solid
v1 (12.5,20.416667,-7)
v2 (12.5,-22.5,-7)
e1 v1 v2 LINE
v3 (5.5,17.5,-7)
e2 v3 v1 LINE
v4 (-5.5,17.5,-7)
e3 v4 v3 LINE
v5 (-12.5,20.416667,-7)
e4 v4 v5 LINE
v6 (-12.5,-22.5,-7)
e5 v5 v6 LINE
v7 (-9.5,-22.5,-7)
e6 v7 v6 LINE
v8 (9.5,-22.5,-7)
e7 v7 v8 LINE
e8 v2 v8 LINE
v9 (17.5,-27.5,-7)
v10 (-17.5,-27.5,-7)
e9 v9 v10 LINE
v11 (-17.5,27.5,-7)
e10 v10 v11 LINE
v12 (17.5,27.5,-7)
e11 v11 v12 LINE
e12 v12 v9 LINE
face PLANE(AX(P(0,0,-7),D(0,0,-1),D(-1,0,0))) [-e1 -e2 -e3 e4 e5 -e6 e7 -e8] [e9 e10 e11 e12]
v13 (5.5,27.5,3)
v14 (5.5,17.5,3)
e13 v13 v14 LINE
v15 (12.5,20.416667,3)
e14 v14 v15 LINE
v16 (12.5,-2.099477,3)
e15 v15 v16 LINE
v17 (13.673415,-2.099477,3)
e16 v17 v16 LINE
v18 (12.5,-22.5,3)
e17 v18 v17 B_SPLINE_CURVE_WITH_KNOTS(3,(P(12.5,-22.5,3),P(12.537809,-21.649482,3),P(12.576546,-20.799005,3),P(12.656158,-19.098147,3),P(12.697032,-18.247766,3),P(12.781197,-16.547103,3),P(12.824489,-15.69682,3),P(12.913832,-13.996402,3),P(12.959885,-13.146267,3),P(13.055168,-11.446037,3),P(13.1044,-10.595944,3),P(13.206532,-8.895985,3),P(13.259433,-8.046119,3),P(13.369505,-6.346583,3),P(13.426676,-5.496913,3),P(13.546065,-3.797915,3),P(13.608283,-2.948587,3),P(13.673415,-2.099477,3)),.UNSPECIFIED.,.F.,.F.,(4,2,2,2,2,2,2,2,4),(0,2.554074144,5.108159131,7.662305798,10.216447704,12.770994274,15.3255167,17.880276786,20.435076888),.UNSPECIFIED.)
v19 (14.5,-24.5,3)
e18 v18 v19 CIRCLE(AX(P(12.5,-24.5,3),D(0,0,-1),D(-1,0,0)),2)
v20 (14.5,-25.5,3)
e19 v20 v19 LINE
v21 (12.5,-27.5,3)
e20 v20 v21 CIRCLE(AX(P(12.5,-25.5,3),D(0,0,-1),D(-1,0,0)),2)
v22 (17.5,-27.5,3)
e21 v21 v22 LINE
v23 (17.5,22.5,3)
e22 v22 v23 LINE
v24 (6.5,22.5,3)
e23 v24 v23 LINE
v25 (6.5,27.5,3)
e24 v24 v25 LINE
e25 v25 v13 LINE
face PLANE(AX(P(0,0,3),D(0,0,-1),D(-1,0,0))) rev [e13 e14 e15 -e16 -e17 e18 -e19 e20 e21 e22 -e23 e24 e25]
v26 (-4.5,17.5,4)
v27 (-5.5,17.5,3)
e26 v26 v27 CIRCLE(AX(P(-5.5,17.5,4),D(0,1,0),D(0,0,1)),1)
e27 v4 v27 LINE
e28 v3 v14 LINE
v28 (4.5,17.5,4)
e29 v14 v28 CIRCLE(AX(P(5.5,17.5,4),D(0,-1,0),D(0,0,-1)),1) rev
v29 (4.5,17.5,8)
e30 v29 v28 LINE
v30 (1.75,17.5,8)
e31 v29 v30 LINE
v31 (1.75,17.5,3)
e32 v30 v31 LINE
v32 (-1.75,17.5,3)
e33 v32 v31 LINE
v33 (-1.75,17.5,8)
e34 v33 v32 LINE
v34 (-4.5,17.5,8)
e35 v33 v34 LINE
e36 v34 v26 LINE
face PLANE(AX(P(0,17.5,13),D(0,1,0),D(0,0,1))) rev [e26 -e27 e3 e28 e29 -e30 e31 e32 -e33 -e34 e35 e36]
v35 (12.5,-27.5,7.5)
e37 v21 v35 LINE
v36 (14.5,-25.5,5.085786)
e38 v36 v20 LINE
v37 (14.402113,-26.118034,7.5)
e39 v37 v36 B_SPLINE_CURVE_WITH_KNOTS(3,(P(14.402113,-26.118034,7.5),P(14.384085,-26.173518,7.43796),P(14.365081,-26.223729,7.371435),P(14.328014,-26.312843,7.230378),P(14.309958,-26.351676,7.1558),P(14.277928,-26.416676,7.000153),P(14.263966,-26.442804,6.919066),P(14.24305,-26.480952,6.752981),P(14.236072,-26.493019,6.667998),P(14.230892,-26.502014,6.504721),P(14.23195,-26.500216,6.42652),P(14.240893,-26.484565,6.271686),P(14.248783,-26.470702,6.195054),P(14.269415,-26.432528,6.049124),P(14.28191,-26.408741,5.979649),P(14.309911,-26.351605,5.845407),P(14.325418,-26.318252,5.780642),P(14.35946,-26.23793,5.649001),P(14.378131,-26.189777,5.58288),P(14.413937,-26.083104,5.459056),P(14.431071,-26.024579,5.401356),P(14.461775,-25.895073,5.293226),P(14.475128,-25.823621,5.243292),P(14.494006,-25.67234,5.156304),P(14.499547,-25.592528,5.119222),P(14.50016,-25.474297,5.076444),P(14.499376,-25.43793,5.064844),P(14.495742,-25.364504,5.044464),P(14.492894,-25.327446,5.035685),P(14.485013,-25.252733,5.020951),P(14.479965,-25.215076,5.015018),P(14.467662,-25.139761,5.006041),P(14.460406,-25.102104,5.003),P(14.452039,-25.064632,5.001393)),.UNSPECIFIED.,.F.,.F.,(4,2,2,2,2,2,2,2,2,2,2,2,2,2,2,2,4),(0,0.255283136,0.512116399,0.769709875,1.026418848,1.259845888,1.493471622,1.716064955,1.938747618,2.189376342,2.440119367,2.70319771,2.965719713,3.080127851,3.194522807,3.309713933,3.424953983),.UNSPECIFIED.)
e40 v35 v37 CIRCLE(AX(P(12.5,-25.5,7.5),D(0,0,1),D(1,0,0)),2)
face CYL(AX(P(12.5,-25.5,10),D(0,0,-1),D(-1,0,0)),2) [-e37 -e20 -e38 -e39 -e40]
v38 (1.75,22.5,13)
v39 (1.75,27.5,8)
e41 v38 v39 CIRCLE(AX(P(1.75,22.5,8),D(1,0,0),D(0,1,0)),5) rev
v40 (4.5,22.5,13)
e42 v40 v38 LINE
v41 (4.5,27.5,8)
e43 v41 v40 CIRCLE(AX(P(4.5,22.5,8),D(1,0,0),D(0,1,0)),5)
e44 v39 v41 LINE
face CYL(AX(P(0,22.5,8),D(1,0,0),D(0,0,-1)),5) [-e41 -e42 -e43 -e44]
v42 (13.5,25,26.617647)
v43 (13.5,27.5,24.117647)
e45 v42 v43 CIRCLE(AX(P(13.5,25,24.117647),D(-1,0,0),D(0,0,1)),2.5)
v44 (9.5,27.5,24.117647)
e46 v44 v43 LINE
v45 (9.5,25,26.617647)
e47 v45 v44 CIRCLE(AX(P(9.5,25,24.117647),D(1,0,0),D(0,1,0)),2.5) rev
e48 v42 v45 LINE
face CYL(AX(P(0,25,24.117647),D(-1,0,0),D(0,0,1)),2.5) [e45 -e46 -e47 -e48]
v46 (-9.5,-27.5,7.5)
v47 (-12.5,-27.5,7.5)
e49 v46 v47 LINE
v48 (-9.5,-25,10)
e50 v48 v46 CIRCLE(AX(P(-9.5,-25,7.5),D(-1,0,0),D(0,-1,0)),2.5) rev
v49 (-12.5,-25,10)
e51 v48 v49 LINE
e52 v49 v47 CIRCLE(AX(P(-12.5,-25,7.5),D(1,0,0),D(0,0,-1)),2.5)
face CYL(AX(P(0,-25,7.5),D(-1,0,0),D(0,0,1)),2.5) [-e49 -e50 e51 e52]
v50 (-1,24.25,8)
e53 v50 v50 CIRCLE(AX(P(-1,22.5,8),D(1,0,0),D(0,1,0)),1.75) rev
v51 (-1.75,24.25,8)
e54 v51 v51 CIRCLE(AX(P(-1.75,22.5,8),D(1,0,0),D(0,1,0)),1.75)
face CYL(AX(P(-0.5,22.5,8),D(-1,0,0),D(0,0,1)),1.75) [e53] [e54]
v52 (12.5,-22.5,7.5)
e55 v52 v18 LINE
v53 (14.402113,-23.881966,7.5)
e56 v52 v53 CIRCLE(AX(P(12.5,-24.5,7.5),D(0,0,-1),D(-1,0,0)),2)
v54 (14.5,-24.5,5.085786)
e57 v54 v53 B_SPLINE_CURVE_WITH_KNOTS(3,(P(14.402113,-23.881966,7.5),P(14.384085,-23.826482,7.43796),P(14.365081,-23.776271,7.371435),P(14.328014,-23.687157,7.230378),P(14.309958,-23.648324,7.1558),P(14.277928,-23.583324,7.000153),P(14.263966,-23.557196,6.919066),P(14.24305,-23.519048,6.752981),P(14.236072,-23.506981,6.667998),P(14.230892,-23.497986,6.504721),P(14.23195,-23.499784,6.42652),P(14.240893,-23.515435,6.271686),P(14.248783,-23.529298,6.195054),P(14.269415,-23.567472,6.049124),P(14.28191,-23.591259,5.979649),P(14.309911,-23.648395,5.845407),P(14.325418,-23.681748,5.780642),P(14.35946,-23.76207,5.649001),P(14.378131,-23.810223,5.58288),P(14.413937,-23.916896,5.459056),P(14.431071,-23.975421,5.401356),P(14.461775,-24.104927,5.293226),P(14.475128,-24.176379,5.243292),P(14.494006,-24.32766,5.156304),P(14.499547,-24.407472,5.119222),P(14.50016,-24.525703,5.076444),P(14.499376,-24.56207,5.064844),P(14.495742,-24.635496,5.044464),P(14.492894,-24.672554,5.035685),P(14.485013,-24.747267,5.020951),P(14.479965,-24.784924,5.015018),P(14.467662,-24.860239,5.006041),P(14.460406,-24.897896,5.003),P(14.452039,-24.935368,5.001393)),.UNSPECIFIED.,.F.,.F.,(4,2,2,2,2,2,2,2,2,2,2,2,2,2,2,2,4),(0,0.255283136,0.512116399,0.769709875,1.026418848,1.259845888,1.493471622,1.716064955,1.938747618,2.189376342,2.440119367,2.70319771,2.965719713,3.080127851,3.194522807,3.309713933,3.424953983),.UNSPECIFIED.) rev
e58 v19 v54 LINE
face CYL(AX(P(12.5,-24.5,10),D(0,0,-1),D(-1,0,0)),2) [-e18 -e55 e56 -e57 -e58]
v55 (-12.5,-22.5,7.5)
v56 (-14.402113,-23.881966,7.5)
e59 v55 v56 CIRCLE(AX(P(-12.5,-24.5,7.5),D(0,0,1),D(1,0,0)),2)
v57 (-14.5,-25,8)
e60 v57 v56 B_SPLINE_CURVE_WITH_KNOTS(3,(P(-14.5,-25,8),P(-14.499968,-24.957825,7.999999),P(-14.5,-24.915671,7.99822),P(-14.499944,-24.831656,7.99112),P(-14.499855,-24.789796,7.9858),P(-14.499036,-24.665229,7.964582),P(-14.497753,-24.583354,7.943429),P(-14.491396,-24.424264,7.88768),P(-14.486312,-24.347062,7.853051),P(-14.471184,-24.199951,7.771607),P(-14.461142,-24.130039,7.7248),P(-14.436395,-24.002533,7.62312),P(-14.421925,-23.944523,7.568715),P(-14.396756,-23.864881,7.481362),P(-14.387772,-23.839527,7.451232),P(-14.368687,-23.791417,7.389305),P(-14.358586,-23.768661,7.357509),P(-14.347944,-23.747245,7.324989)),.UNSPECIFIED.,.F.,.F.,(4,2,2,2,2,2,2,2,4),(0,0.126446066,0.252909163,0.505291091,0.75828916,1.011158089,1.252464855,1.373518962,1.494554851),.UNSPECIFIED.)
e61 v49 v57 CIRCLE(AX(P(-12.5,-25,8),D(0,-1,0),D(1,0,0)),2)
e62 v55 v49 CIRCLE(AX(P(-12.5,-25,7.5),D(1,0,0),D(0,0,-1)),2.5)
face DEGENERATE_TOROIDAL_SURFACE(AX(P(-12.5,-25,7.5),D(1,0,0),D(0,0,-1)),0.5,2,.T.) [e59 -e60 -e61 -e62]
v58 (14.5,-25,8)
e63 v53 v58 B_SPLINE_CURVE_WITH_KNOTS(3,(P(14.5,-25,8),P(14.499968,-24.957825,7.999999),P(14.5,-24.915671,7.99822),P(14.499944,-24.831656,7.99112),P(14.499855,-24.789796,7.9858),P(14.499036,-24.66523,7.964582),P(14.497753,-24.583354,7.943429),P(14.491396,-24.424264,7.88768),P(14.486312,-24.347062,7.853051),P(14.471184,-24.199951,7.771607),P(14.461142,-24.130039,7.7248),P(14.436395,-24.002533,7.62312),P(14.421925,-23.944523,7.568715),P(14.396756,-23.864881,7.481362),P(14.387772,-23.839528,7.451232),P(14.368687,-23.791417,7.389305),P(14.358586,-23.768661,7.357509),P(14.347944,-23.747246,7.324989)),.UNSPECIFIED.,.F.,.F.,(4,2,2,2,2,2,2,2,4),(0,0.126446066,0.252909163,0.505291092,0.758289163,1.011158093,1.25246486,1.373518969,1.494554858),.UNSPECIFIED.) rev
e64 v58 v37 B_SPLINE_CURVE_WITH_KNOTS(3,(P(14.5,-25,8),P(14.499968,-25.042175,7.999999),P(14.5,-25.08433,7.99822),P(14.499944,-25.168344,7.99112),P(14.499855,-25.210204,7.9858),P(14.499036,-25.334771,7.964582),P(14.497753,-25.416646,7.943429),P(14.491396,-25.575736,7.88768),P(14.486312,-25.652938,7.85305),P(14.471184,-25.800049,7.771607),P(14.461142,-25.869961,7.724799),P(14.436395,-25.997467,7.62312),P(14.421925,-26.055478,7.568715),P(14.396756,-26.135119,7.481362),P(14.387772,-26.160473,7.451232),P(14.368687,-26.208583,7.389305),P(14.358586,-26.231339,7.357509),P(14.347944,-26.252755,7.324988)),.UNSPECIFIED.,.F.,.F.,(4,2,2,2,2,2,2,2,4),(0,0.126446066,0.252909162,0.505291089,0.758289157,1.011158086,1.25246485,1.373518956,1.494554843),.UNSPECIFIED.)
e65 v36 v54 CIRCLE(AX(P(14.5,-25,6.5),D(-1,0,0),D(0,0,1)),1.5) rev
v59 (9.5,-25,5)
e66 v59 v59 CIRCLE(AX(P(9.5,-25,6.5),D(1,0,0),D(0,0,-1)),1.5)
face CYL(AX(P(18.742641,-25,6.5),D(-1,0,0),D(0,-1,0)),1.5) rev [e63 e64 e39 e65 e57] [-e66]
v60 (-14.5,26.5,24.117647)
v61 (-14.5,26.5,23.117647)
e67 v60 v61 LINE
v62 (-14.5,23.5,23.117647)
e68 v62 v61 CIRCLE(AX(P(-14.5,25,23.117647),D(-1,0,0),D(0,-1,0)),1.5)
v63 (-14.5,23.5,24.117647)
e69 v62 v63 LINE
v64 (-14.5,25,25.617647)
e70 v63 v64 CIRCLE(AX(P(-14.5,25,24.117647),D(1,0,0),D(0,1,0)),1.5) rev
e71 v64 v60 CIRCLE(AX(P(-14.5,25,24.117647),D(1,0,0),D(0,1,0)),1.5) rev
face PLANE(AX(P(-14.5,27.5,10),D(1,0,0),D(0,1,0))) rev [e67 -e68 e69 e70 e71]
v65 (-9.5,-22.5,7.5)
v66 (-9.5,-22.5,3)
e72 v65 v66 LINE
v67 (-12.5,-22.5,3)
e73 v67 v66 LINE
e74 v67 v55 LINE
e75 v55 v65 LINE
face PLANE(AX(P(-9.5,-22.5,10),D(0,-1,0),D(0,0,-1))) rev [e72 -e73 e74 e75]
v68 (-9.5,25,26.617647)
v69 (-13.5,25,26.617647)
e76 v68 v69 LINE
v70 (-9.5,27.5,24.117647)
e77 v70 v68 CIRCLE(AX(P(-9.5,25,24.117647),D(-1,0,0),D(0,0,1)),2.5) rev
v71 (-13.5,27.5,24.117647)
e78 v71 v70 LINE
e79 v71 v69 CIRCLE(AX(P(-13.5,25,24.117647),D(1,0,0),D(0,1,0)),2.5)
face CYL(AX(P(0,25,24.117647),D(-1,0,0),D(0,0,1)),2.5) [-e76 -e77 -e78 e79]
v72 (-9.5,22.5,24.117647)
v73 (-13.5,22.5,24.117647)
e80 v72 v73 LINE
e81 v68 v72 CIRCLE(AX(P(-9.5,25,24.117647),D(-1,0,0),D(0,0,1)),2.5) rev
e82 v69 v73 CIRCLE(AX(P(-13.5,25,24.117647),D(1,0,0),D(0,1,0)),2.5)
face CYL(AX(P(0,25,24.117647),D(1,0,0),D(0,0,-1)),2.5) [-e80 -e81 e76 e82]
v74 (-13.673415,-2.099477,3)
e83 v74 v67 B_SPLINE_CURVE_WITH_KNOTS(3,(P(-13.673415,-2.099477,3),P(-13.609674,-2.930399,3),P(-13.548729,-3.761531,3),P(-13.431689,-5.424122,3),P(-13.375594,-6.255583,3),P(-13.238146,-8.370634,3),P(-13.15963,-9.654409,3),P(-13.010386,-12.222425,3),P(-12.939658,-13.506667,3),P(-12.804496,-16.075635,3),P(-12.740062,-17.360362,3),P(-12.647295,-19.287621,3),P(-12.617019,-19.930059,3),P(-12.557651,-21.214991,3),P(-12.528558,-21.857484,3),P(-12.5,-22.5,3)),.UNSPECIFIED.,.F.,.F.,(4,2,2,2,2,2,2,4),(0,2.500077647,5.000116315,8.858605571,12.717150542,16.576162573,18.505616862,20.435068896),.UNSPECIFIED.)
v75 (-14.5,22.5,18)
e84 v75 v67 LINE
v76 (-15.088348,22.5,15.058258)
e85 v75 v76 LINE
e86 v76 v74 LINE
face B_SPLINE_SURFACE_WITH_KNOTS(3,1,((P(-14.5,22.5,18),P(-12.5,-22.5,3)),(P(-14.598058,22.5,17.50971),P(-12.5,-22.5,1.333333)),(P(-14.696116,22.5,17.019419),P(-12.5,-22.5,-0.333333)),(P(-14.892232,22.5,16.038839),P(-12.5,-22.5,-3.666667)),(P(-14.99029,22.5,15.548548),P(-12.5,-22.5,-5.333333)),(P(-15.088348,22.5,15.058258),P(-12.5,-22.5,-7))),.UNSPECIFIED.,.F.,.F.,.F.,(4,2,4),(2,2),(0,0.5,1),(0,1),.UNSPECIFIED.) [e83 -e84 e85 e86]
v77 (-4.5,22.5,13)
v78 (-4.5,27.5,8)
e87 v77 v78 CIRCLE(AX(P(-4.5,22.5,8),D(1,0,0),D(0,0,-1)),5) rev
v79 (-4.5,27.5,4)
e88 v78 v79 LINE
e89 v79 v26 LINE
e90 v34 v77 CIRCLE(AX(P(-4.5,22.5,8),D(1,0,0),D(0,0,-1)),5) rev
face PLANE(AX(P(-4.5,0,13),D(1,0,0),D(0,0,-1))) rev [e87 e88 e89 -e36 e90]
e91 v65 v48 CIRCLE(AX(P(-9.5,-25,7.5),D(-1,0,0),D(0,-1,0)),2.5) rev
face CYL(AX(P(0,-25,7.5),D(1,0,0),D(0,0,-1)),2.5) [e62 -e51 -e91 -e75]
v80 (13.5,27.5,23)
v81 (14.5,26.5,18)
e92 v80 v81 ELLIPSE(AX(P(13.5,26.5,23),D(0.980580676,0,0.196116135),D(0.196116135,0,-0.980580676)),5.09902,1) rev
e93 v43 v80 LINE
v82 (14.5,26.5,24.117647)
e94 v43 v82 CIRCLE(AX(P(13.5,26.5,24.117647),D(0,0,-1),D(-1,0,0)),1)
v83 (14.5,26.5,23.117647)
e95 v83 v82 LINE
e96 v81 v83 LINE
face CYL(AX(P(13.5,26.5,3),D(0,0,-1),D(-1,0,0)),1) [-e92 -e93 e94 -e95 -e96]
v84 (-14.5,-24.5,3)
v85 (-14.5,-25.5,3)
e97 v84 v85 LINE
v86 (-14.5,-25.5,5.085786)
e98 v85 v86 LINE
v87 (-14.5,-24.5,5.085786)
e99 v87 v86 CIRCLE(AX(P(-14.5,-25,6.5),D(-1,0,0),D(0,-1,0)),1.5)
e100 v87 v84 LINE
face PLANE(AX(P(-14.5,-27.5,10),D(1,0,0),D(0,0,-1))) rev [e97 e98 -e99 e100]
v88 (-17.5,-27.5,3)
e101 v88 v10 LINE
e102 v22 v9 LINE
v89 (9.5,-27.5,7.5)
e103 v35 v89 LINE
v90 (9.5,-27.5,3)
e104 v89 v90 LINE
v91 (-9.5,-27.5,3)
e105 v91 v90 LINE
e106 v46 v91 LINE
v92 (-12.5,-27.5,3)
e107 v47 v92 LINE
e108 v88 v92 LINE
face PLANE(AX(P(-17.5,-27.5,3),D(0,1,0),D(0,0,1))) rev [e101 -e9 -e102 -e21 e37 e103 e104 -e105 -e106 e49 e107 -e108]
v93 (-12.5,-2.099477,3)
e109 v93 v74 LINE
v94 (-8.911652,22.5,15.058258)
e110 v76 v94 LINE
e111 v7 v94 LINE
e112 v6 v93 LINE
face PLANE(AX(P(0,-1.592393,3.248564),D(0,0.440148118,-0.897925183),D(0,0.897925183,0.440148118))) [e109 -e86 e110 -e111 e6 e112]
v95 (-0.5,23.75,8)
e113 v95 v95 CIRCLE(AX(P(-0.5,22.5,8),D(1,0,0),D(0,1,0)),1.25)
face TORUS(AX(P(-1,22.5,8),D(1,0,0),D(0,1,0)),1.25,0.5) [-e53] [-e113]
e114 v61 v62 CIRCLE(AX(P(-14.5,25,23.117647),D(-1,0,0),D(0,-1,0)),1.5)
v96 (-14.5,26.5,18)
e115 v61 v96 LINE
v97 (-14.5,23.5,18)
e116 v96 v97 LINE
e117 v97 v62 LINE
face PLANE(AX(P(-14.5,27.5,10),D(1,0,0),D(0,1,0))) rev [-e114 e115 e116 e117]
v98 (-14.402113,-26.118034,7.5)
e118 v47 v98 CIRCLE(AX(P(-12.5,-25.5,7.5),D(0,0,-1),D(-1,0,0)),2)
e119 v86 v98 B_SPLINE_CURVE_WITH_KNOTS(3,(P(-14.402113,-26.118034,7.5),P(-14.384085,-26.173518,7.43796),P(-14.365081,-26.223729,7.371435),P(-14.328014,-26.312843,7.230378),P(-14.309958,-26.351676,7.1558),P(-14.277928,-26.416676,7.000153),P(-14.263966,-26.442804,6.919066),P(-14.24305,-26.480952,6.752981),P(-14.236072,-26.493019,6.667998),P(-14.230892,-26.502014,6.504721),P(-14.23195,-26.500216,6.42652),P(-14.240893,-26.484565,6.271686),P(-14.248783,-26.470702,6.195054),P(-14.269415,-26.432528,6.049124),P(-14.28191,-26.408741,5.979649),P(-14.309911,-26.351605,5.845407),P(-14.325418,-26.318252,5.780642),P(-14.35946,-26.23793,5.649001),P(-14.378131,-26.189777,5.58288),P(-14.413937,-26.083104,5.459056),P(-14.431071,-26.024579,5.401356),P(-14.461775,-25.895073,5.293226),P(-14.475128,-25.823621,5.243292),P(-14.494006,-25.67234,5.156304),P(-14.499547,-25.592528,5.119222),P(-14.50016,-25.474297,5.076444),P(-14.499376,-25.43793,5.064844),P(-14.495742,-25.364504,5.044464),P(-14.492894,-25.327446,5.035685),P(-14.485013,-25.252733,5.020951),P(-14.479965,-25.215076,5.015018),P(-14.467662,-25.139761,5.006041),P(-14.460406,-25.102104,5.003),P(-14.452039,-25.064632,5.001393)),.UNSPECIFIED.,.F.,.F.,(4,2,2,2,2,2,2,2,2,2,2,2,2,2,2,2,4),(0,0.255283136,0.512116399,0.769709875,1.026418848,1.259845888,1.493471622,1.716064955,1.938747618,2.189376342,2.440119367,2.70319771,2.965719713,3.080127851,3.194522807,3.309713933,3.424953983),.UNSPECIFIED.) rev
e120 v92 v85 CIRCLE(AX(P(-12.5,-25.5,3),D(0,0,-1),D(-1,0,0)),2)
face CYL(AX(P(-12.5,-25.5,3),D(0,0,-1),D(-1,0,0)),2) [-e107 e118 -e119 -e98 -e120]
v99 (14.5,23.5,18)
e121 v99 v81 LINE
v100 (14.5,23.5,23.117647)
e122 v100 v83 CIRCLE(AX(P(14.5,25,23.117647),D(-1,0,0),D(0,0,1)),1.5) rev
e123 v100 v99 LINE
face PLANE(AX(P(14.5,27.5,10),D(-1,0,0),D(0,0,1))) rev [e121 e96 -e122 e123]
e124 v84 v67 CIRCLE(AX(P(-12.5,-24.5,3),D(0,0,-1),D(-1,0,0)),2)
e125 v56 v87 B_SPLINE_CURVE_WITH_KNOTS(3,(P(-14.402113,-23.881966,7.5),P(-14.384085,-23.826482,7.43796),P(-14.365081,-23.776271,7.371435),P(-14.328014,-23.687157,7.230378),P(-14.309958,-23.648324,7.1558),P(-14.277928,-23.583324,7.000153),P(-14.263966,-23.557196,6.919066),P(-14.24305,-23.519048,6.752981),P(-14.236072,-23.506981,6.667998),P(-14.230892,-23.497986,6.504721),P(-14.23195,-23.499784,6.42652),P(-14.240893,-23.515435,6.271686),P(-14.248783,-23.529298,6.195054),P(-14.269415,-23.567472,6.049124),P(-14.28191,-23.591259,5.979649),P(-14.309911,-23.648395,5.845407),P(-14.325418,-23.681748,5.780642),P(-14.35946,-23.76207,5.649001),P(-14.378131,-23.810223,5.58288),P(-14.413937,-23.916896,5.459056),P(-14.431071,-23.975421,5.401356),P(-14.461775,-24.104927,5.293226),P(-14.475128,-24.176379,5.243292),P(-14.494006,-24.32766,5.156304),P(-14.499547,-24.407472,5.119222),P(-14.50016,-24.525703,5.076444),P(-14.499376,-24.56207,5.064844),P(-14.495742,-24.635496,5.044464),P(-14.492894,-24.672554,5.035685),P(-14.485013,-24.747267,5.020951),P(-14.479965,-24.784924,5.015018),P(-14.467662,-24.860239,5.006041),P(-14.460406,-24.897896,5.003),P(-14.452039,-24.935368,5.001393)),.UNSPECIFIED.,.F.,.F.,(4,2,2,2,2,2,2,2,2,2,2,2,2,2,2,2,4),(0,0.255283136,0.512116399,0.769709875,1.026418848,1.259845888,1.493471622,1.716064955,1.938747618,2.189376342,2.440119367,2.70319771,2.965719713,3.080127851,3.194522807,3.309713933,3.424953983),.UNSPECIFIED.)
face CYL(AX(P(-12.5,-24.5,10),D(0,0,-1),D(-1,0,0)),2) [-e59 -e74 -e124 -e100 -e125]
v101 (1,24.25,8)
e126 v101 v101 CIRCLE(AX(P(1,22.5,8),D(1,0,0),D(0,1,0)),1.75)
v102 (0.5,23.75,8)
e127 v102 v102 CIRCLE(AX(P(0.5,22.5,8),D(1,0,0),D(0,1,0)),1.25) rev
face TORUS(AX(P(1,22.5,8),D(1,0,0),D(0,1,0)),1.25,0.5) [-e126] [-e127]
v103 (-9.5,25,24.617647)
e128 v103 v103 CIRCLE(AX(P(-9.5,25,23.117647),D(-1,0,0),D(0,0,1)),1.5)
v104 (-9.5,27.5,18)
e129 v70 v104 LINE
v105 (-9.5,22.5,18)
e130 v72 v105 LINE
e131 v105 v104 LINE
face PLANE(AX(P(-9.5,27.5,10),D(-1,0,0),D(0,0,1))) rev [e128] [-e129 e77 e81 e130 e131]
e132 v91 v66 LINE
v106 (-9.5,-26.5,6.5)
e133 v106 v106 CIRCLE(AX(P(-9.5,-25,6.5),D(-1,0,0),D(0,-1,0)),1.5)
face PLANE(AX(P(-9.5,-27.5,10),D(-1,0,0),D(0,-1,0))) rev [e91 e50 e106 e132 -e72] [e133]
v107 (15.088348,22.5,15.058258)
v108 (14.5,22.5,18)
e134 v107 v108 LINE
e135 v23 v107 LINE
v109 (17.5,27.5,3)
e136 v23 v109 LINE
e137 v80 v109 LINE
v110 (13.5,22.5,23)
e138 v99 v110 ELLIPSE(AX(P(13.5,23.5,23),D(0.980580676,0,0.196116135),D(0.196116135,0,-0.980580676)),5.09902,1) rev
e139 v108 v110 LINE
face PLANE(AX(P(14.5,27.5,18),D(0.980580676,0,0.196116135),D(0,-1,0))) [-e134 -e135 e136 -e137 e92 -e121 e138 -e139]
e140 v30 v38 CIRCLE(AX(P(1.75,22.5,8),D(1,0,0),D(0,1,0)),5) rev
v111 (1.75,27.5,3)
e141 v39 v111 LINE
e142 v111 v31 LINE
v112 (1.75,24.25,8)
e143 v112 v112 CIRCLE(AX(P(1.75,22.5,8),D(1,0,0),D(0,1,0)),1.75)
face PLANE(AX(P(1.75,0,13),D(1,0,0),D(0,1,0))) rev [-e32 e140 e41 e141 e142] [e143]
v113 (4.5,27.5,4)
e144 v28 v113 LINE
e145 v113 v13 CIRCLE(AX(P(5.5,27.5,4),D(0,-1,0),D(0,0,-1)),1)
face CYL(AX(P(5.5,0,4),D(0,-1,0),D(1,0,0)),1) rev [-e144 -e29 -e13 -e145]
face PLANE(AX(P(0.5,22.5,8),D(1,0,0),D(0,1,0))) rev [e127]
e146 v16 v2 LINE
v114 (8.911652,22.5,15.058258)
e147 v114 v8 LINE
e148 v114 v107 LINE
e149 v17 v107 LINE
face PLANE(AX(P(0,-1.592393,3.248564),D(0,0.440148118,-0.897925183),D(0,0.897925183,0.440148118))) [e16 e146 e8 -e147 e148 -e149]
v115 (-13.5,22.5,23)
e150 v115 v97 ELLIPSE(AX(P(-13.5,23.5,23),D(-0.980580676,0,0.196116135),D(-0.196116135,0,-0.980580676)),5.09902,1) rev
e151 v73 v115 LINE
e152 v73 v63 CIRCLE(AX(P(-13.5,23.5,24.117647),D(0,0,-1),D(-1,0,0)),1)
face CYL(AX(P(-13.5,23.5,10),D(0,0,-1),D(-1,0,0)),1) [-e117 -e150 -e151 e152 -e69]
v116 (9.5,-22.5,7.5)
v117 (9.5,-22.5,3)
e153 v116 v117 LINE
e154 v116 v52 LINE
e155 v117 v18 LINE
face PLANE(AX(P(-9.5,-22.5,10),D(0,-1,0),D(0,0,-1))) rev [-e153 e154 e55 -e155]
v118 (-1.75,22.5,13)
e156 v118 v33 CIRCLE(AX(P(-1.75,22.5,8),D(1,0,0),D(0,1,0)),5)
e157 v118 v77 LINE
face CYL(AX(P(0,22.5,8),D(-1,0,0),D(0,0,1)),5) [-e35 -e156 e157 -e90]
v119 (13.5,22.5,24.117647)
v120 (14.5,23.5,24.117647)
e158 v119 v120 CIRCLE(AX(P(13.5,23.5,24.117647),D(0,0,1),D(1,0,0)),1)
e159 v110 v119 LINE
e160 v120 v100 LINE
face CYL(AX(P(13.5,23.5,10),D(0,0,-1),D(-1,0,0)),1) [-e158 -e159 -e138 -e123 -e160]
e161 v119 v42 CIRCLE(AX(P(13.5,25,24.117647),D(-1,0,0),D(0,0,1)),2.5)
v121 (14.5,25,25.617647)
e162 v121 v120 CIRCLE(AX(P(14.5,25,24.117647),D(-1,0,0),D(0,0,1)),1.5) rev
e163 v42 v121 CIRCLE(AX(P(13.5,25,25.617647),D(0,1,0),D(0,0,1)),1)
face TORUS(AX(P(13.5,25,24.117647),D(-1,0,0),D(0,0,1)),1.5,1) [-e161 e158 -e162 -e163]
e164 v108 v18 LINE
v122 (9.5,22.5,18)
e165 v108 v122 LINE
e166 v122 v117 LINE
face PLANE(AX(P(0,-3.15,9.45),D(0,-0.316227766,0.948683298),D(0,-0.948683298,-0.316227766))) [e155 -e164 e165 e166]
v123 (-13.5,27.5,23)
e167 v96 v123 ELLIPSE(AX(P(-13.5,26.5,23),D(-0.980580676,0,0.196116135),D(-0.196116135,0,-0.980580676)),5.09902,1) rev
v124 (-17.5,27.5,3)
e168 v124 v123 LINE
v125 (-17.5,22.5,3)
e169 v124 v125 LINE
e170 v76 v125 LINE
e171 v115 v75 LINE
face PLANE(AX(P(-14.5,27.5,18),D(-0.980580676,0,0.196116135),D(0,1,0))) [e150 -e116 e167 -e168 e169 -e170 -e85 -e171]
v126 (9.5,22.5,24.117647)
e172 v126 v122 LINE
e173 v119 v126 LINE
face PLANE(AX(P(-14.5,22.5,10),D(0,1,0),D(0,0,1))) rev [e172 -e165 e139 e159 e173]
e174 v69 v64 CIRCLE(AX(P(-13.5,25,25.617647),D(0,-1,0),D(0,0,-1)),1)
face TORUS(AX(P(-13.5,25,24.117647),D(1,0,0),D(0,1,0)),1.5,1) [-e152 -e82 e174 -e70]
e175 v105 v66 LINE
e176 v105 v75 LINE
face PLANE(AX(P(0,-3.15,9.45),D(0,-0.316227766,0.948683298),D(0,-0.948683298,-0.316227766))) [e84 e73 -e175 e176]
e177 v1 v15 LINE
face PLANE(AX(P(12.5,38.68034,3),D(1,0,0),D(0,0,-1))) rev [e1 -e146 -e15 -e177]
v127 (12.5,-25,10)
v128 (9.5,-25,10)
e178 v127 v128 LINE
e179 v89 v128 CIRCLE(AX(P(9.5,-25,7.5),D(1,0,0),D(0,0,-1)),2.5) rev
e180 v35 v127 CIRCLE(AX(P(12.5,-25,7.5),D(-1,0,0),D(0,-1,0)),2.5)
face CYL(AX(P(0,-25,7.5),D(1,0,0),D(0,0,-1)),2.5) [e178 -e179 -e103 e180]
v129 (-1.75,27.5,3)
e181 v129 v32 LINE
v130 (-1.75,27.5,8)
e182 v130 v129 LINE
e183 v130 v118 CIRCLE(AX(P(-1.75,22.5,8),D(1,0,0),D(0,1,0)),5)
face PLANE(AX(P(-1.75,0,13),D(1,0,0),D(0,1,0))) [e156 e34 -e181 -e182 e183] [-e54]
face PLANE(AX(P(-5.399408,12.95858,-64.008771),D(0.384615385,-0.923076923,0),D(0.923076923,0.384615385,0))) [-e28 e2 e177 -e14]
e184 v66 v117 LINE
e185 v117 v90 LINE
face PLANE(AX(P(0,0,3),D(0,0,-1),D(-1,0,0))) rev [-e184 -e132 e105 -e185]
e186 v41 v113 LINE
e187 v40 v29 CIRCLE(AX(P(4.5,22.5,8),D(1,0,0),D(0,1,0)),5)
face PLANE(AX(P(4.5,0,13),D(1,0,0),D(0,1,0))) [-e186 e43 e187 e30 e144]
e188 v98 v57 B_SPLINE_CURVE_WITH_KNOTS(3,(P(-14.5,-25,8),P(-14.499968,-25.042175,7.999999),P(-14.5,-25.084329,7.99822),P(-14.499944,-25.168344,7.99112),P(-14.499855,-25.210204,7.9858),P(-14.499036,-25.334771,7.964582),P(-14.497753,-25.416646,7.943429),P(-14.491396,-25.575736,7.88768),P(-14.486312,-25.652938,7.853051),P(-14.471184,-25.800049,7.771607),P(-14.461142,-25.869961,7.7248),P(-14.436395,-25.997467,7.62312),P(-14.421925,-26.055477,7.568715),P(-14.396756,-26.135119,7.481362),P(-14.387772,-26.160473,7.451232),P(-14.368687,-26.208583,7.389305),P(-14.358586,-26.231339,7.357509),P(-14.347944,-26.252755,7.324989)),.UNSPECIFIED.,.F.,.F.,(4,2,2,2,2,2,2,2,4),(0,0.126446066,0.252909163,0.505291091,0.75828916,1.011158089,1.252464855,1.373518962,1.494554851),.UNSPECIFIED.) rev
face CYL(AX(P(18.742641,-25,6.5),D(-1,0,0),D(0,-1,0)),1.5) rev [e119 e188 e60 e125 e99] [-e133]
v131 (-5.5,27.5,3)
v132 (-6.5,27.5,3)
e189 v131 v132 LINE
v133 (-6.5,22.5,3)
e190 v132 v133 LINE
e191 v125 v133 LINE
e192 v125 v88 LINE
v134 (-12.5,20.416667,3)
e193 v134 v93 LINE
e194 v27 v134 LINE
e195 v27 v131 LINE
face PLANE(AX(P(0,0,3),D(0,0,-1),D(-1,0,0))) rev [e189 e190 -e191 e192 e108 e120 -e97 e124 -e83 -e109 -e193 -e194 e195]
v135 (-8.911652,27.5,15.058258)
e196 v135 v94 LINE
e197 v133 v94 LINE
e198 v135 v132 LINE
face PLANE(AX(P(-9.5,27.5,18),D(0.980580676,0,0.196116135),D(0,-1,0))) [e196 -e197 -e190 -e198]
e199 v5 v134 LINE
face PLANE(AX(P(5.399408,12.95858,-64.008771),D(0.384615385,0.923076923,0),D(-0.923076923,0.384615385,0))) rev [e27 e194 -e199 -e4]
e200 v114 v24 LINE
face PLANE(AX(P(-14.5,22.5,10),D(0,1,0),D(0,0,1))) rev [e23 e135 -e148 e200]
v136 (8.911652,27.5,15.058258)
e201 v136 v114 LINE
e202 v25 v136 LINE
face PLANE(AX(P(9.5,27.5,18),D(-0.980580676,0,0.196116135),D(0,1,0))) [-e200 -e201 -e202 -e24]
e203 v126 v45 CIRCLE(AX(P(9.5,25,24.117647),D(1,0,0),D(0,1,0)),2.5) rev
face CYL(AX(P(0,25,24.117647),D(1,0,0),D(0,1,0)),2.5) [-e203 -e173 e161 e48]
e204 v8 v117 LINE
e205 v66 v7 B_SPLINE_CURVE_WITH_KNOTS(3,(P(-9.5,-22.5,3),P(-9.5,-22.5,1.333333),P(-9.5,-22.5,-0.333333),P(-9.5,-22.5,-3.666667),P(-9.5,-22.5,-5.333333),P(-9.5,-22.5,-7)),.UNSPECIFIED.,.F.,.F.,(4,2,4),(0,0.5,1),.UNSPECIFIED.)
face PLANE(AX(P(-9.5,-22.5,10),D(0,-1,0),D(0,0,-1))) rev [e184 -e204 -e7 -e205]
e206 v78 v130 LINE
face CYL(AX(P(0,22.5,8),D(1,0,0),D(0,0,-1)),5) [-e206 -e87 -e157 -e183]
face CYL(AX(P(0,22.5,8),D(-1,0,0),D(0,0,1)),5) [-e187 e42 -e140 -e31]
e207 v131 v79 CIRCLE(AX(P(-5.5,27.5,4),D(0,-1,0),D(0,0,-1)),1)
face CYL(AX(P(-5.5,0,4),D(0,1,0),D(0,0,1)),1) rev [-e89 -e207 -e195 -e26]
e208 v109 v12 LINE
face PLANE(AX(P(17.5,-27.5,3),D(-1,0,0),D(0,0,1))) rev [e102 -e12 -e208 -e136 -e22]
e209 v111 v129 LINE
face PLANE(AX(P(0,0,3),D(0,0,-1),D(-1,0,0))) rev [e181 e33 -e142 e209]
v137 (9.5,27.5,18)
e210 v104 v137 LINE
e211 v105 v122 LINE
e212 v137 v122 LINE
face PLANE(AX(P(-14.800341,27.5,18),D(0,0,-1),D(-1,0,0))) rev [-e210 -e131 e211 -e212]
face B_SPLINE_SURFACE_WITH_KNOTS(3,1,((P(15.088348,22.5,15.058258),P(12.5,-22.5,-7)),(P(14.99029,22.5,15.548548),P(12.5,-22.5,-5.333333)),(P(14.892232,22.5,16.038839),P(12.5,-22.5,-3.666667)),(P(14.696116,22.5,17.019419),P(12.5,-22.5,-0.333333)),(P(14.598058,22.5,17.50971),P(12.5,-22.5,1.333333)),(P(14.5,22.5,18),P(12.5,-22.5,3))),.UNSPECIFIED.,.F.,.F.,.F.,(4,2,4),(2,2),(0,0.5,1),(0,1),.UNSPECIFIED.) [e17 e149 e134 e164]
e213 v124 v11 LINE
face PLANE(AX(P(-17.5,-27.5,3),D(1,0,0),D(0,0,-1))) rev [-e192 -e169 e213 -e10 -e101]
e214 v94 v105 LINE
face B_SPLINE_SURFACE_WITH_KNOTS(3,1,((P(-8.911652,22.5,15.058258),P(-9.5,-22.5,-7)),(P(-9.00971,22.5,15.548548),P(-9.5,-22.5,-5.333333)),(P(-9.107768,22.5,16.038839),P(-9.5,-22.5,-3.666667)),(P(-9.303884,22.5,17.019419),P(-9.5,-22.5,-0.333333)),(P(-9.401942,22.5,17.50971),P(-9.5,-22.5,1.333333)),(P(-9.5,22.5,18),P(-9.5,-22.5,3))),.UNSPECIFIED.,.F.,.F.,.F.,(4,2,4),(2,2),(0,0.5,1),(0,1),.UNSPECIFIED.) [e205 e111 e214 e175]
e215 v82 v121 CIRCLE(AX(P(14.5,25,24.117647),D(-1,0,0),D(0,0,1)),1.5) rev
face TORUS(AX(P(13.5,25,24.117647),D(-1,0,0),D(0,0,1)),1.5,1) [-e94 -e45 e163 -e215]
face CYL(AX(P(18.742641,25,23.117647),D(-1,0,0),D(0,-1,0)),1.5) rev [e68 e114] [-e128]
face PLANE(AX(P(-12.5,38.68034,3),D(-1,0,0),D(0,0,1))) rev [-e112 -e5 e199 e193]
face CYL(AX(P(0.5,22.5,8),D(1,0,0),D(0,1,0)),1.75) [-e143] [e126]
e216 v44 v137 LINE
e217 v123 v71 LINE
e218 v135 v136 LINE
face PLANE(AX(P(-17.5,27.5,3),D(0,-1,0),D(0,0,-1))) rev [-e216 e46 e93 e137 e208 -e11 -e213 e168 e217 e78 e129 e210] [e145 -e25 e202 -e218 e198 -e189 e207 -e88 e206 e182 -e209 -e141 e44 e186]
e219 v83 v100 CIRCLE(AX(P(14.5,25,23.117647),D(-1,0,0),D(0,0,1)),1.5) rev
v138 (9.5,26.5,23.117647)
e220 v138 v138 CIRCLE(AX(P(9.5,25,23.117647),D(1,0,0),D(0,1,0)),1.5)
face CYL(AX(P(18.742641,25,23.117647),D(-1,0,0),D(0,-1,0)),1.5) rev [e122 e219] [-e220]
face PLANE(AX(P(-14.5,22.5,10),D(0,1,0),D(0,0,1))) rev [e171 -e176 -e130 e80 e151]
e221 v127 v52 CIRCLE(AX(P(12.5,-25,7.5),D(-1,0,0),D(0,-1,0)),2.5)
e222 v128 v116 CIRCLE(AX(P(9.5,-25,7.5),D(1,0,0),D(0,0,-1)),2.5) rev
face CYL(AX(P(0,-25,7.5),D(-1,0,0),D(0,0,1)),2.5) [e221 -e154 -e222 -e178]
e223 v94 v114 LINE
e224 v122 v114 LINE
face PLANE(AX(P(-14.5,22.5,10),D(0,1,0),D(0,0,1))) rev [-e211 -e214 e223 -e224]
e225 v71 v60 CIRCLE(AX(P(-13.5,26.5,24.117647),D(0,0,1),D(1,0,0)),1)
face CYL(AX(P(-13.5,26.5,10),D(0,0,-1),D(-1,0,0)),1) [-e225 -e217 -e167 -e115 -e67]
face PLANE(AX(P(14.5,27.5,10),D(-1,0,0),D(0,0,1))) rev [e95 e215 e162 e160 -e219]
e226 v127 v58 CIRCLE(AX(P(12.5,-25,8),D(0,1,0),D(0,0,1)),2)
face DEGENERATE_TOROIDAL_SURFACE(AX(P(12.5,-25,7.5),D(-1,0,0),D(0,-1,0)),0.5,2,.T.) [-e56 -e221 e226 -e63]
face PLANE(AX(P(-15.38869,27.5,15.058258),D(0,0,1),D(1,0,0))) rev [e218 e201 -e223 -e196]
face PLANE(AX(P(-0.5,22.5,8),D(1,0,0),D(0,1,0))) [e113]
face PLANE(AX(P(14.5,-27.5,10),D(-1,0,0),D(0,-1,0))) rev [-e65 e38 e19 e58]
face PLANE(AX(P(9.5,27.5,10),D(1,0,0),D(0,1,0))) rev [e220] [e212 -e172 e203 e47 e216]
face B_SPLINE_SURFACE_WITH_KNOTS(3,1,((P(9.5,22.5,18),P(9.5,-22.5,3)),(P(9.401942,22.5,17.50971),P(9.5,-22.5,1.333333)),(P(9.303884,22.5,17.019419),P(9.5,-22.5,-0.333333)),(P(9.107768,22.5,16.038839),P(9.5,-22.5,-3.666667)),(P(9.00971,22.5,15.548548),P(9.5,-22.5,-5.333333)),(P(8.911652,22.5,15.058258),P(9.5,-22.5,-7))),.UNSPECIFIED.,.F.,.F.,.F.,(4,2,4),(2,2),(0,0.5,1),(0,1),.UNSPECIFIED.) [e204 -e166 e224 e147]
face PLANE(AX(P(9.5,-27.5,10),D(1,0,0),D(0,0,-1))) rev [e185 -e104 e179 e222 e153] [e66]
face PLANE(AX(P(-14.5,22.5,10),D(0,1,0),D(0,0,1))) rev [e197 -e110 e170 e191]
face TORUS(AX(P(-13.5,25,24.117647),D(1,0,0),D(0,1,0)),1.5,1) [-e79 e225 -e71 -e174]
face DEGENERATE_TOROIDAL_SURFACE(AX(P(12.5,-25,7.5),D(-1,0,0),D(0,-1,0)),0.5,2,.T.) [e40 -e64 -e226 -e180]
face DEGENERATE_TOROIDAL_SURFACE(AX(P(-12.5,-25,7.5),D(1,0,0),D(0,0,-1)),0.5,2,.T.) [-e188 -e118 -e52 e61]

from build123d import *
from OCP.BRepFilletAPI import BRepFilletAPI_MakeChamfer

# Parameters (mm, degrees)
SKETCH1_W           = 35
SKETCH1_H           = 55
BOSS_EXTRUDE1_DEPTH = 3
SKETCH2_W           = 5
SKETCH2_H           = 5
BOSS_EXTRUDE2_DEPTH = 7
CUT_EXTRUDE1_REACH  = 45.362
FILLET1_R           = 2.5
SKETCH4_W           = 5
SKETCH4_H           = 5
BOSS_EXTRUDE3_DEPTH = 16.61764706
CUT_EXTRUDE2_REACH  = 51.887
FILLET2_R           = 2.5
FILLET3_R           = 2
CHAMFER1_SIZE       = 3
CHAMFER1_SIZE_2     = 15
FILLET5_R           = 1
SKETCH6_W           = 2.75
SKETCH6_H           = 10
BOSS_EXTRUDE4_DEPTH = 10
FILLET6_R           = 5
FILLET7_R           = 1
BOSS_EXTRUDE5_START = -2.75
BOSS_EXTRUDE5_DEPTH = 1.25
BOSS_EXTRUDE6_START = -4
BOSS_EXTRUDE6_DEPTH = 1.25
CHAMFER2_SIZE       = 3
CHAMFER2_SIZE2      = 15
BOSS_EXTRUDE7_REACH = 48.364
SKETCH10_W          = 3
SKETCH10_H          = 5
SKETCH15_W          = 35
SKETCH15_H          = 55
BOSS_EXTRUDE8_DEPTH = 7
CUT_EXTRUDE5_DEPTH  = 10
BOSS_EXTRUDE9_START = -5
SKETCH19_W          = 5
SKETCH19_H          = 10
BOSS_EXTRUDE9_DEPTH = 55


with BuildPart() as part:
    # Sketch1 → Boss-Extrude1 (new body)
    with BuildSketch(Plane.XY):
        Rectangle(SKETCH1_W, SKETCH1_H)
    extrude(amount=BOSS_EXTRUDE1_DEPTH)

    # Sketch2 → Boss-Extrude2 (add)
    with BuildSketch(Plane.XY.offset(3)):
        with Locations((-12, 25)):
            Rectangle(SKETCH2_W, SKETCH2_H)
        with Locations((12, 25)):
            Rectangle(SKETCH2_W, SKETCH2_H)
        with Locations((-12, -25)):
            Rectangle(SKETCH2_W, SKETCH2_H)
        with Locations((12, -25)):
            Rectangle(SKETCH2_W, SKETCH2_H)
    extrude(amount=BOSS_EXTRUDE2_DEPTH)

    # Cut-Extrude1: up to this face of the body (flat: up to its plane)
    cut_extrude1_end = Plane(part.part.faces().sort_by_distance((14.5, 25, 6.5))[0])
    # Sketch3 → Cut-Extrude1 (cut, up to the picked face)
    with BuildSketch(Plane.ZY.offset(14.5), mode=Mode.PRIVATE) as cut_extrude1_sk1:
        with BuildLine():
            ThreePointArc((8, -25), (6.957766147, -23.571556737), (5.279399793, -24.128142709))
            Line((5.279399793, -24.128142709), (7.720600207, -25.871857291))
            ThreePointArc((7.720600207, -25.871857291), (7.928443263, -25.457766147), (8, -25))
        make_face()
    cut_extrude1_tool1 = split(extrude(cut_extrude1_sk1.sketch, amount=-CUT_EXTRUDE1_REACH, mode=Mode.PRIVATE), bisect_by=cut_extrude1_end, keep=Keep.BOTH, mode=Mode.PRIVATE)
    # Sketch3 → Cut-Extrude1 (cut, up to the picked face)
    with BuildSketch(Plane.ZY.offset(14.5), mode=Mode.PRIVATE) as cut_extrude1_sk2:
        with BuildLine():
            Line((7.720600207, -25.871857291), (5.279399793, -24.128142709))
            ThreePointArc((5.279399793, -24.128142709), (5.628142709, -26.220600207), (7.720600207, -25.871857291))
        make_face()
    cut_extrude1_tool2 = split(extrude(cut_extrude1_sk2.sketch, amount=-CUT_EXTRUDE1_REACH, mode=Mode.PRIVATE), bisect_by=cut_extrude1_end, keep=Keep.BOTH, mode=Mode.PRIVATE)
    # Sketch3 → Cut-Extrude1 (cut, up to the picked face)
    with BuildSketch(Plane.ZY.offset(14.5), mode=Mode.PRIVATE) as cut_extrude1_sk3:
        with BuildLine():
            ThreePointArc((8, -25), (6.957766147, -23.571556737), (5.279399793, -24.128142709))
            Line((5.279399793, -24.128142709), (7.720600207, -25.871857291))
            ThreePointArc((7.720600207, -25.871857291), (7.928443263, -25.457766147), (8, -25))
        make_face()
    cut_extrude1_tool3 = split(extrude(cut_extrude1_sk3.sketch, amount=-CUT_EXTRUDE1_REACH, mode=Mode.PRIVATE), bisect_by=cut_extrude1_end, keep=Keep.BOTH, mode=Mode.PRIVATE)
    # Sketch3 → Cut-Extrude1 (cut, up to the picked face)
    with BuildSketch(Plane.ZY.offset(14.5), mode=Mode.PRIVATE) as cut_extrude1_sk4:
        with BuildLine():
            Line((7.720600207, -25.871857291), (5.279399793, -24.128142709))
            ThreePointArc((5.279399793, -24.128142709), (5.628142709, -26.220600207), (7.720600207, -25.871857291))
        make_face()
    cut_extrude1_tool4 = split(extrude(cut_extrude1_sk4.sketch, amount=-CUT_EXTRUDE1_REACH, mode=Mode.PRIVATE), bisect_by=cut_extrude1_end, keep=Keep.BOTH, mode=Mode.PRIVATE)
    add(cut_extrude1_tool1.solids().sort_by(Axis((-14.5, -24.481961, 6.870028), (1, 0, 0)))[0], mode=Mode.SUBTRACT)
    add(cut_extrude1_tool2.solids().sort_by(Axis((-14.5, -25.518039, 6.129972), (1, 0, 0)))[0], mode=Mode.SUBTRACT)
    add(cut_extrude1_tool3.solids().sort_by(Axis((-14.5, -24.481961, 6.870028), (1, 0, 0)))[0], mode=Mode.SUBTRACT)
    add(cut_extrude1_tool4.solids().sort_by(Axis((-14.5, -25.518039, 6.129972), (1, 0, 0)))[0], mode=Mode.SUBTRACT)

    # Fillet1
    fillet1_edges = [part.edges().sort_by_distance(p)[0] for p in [
        (12, -27.5, 10),
        (12, -22.5, 10),
        (-12, -27.5, 10),
        (-12, -22.5, 10),
    ]]
    fillet(fillet1_edges, radius=FILLET1_R - 0.0001)  # a hair under: the kernel refuses the full size

    # Sketch4 → Boss-Extrude3 (add)
    with BuildSketch(Plane.XY.offset(10)):
        with Locations((-12, 25)):
            Rectangle(SKETCH4_W, SKETCH4_H)
        with Locations((12, 25)):
            Rectangle(SKETCH4_W, SKETCH4_H)
    extrude(amount=BOSS_EXTRUDE3_DEPTH)

    # Cut-Extrude2: up to this face of the body (flat: up to its plane)
    cut_extrude2_end = Plane(part.part.faces().sort_by_distance((14.5, 25, 14.80882353))[0])
    # Sketch5 → Cut-Extrude2 (cut, up to the picked face)
    with BuildSketch(Plane.ZY.offset(14.5), mode=Mode.PRIVATE) as cut_extrude2_sk1:
        with BuildLine():
            ThreePointArc((24.61764706, 25), (23.575413207, 26.428443263), (21.897046853, 25.871857291))
            Line((21.897046853, 25.871857291), (24.338247267, 24.128142709))
            ThreePointArc((24.338247267, 24.128142709), (24.546090323, 24.542233853), (24.61764706, 25))
        make_face()
    cut_extrude2_tool1 = split(extrude(cut_extrude2_sk1.sketch, amount=-CUT_EXTRUDE2_REACH, mode=Mode.PRIVATE), bisect_by=cut_extrude2_end, keep=Keep.BOTH, mode=Mode.PRIVATE)
    # Sketch5 → Cut-Extrude2 (cut, up to the picked face)
    with BuildSketch(Plane.ZY.offset(14.5), mode=Mode.PRIVATE) as cut_extrude2_sk2:
        with BuildLine():
            Line((24.338247267, 24.128142709), (21.897046853, 25.871857291))
            ThreePointArc((21.897046853, 25.871857291), (22.245789769, 23.779399793), (24.338247267, 24.128142709))
        make_face()
    cut_extrude2_tool2 = split(extrude(cut_extrude2_sk2.sketch, amount=-CUT_EXTRUDE2_REACH, mode=Mode.PRIVATE), bisect_by=cut_extrude2_end, keep=Keep.BOTH, mode=Mode.PRIVATE)
    # Sketch5 → Cut-Extrude2 (cut, up to the picked face)
    with BuildSketch(Plane.ZY.offset(14.5), mode=Mode.PRIVATE) as cut_extrude2_sk3:
        with BuildLine():
            ThreePointArc((24.61764706, 25), (23.575413207, 26.428443263), (21.897046853, 25.871857291))
            Line((21.897046853, 25.871857291), (24.338247267, 24.128142709))
            ThreePointArc((24.338247267, 24.128142709), (24.546090323, 24.542233853), (24.61764706, 25))
        make_face()
    cut_extrude2_tool3 = split(extrude(cut_extrude2_sk3.sketch, amount=-CUT_EXTRUDE2_REACH, mode=Mode.PRIVATE), bisect_by=cut_extrude2_end, keep=Keep.BOTH, mode=Mode.PRIVATE)
    # Sketch5 → Cut-Extrude2 (cut, up to the picked face)
    with BuildSketch(Plane.ZY.offset(14.5), mode=Mode.PRIVATE) as cut_extrude2_sk4:
        with BuildLine():
            Line((24.338247267, 24.128142709), (21.897046853, 25.871857291))
            ThreePointArc((21.897046853, 25.871857291), (22.245789769, 23.779399793), (24.338247267, 24.128142709))
        make_face()
    cut_extrude2_tool4 = split(extrude(cut_extrude2_sk4.sketch, amount=-CUT_EXTRUDE2_REACH, mode=Mode.PRIVATE), bisect_by=cut_extrude2_end, keep=Keep.BOTH, mode=Mode.PRIVATE)
    add(cut_extrude2_tool1.solids().sort_by(Axis((-14.5, 25.518039, 23.487675), (1, 0, 0)))[0], mode=Mode.SUBTRACT)
    add(cut_extrude2_tool2.solids().sort_by(Axis((-14.5, 24.481961, 22.747619), (1, 0, 0)))[0], mode=Mode.SUBTRACT)
    add(cut_extrude2_tool3.solids().sort_by(Axis((-14.5, 25.518039, 23.487675), (1, 0, 0)))[0], mode=Mode.SUBTRACT)
    add(cut_extrude2_tool4.solids().sort_by(Axis((-14.5, 24.481961, 22.747619), (1, 0, 0)))[0], mode=Mode.SUBTRACT)

    # Fillet2
    fillet2_edges = [part.edges().sort_by_distance(p)[0] for p in [
        (12, 22.5, 26.61764706),
        (12, 27.5, 26.61764706),
        (-12, 22.5, 26.61764706),
        (-12, 27.5, 26.61764706),
    ]]
    fillet(fillet2_edges, radius=FILLET2_R - 0.0001)  # a hair under: the kernel refuses the full size

    # Fillet3
    # the kernel refuses this fillet: 2 mm, written as the material it takes off along each edge
    with BuildSketch(Plane(origin=(14.5, -22.5, 3), x_dir=(0, -1, 0), z_dir=(0, 0, 1)), Plane(origin=(14.5, -27.5, 3), x_dir=(-1, 0, 0), z_dir=(0, 0, 1)), Plane(origin=(-14.5, -22.5, 3), x_dir=(1, 0, 0), z_dir=(0, 0, 1))) as fillet3_piece_1:
        with BuildLine():
            CenterArc((FILLET3_R, -FILLET3_R), FILLET3_R, 90, 90)
            Line((0, -FILLET3_R), (0, 0))
            Line((0, 0), (FILLET3_R, 0))
        make_face()
    extrude(amount=4.5001, mode=Mode.SUBTRACT)
    with BuildSketch(Plane(origin=(14.5, -24.9999, 7.5001), x_dir=(0, 0, 1), z_dir=(0, -1, 0))) as fillet3_piece_2:
        with BuildLine():
            CenterArc((2.4999 - FILLET3_R, FILLET3_R), FILLET3_R, 270, 90)
            Line((2.4999, FILLET3_R), (2.4999, 0))
            Line((2.4999, 0), (2.4999 - FILLET3_R, 0))
        make_face()
    revolve(axis=Axis((14.5, -24.9999, 7.5001), (-1, 0, 0)), revolution_arc=90, mode=Mode.SUBTRACT)
    with BuildSketch(Plane(origin=(14.5, -25.0001, 7.5001), x_dir=(0, -1, 0), z_dir=(0, 0, -1))) as fillet3_piece_3:
        with BuildLine():
            CenterArc((2.4999 - FILLET3_R, FILLET3_R), FILLET3_R, 270, 90)
            Line((2.4999, FILLET3_R), (2.4999, 0))
            Line((2.4999, 0), (2.4999 - FILLET3_R, 0))
        make_face()
    revolve(axis=Axis((14.5, -25.0001, 7.5001), (-1, 0, 0)), revolution_arc=90, mode=Mode.SUBTRACT)
    with BuildSketch(Plane(origin=(-14.5, -27.5, 3), x_dir=(1, 0, 0), z_dir=(0, 0, 1))) as fillet3_piece_4:
        with BuildLine():
            CenterArc((FILLET3_R, FILLET3_R), FILLET3_R, 180, 90)
            Line((0, FILLET3_R), (0, 0))
            Line((0, 0), (FILLET3_R, 0))
        make_face()
    extrude(amount=4.5001, mode=Mode.SUBTRACT)
    with BuildSketch(Plane(origin=(-14.5, -24.9999, 7.5001), x_dir=(0, 0, 1), z_dir=(0, -1, 0))) as fillet3_piece_5:
        with BuildLine():
            CenterArc((2.4999 - FILLET3_R, -FILLET3_R), FILLET3_R, 0, 90)
            Line((2.4999, -FILLET3_R), (2.4999, 0))
            Line((2.4999, 0), (2.4999 - FILLET3_R, 0))
        make_face()
    revolve(axis=Axis((-14.5, -24.9999, 7.5001), (-1, 0, 0)), revolution_arc=90, mode=Mode.SUBTRACT)
    with BuildSketch(Plane(origin=(-14.5, -25.0001, 7.5001), x_dir=(0, -1, 0), z_dir=(0, 0, -1))) as fillet3_piece_6:
        with BuildLine():
            CenterArc((2.4999 - FILLET3_R, -FILLET3_R), FILLET3_R, 0, 90)
            Line((2.4999, -FILLET3_R), (2.4999, 0))
            Line((2.4999, 0), (2.4999 - FILLET3_R, 0))
        make_face()
    revolve(axis=Axis((-14.5, -25.0001, 7.5001), (-1, 0, 0)), revolution_arc=90, mode=Mode.SUBTRACT)
    with BuildSketch(Plane(origin=(-14.5, -25.0001, 10), x_dir=(0, 0, -1), z_dir=(0, 1, 0))) as fillet3_piece_7:
        with BuildLine():
            CenterArc((FILLET3_R, -FILLET3_R), FILLET3_R, 90, 90)
            Line((0, -FILLET3_R), (0, 0))
            Line((0, 0), (FILLET3_R, 0))
        make_face()
    extrude(amount=0.0002, mode=Mode.SUBTRACT)
    with BuildSketch(Plane(origin=(14.5, -25.0001, 10), x_dir=(0, 0, -1), z_dir=(0, 1, 0))) as fillet3_piece_8:
        with BuildLine():
            CenterArc((FILLET3_R, FILLET3_R), FILLET3_R, 180, 90)
            Line((0, FILLET3_R), (0, 0))
            Line((0, 0), (FILLET3_R, 0))
        make_face()
    extrude(amount=0.0002, mode=Mode.SUBTRACT)

    # Chamfer1
    chamfer1_edges_1 = [part.edges().sort_by_distance(p)[0] for p in [
        (-14.5, 25, 3),
    ]]
    chamfer1_side_1 = [part.faces().sort_by_distance(p)[0] for p in [
        (-14.56, 25, 3),
    ]]
    chamfer1_edges_2 = [part.edges().sort_by_distance(p)[0] for p in [
        (14.5, 25, 3),
    ]]
    chamfer1_side_2 = [part.faces().sort_by_distance(p)[0] for p in [
        (14.5, 25, 3.06),
    ]]
    chamfer1 = BRepFilletAPI_MakeChamfer(part.part.solid().wrapped)
    for e in chamfer1_edges_1:
        chamfer1.Add(CHAMFER1_SIZE - 0.0001, CHAMFER1_SIZE_2 - 0.0001, e.wrapped, chamfer1_side_1[0].wrapped)
    for e in chamfer1_edges_2:
        chamfer1.Add(CHAMFER1_SIZE_2 - 0.0001, CHAMFER1_SIZE - 0.0001, e.wrapped, chamfer1_side_2[0].wrapped)
    add(Compound.cast(chamfer1.Shape()), mode=Mode.REPLACE)  # a hair under: the kernel refuses the full size

    # Fillet5
    fillet5_edges = [part.edges().sort_by_distance(p)[0] for p in [
        (14.5, 27.5, 21.05882353),
        (14.5, 22.5, 21.05882353),
        (14.5, 26.767796242, 25.885443302),
        (14.5, 23.232203758, 25.885443302),
        (-14.5, 27.5, 21.05882353),
        (-14.5, 22.5, 21.05882353),
        (-14.5, 26.767796242, 25.885443302),
        (-14.5, 23.232203758, 25.885443302),
    ]]
    fillet(fillet5_edges, radius=FILLET5_R - 0.0001)  # a hair under: the kernel refuses the full size

    # Sketch6 → Boss-Extrude4 (add)
    with BuildSketch(Plane.XY.offset(3)):
        with Locations((-3.125, 22.5)):
            Rectangle(SKETCH6_W, SKETCH6_H)
        with Locations((3.125, 22.5)):
            Rectangle(SKETCH6_W, SKETCH6_H)
    extrude(amount=BOSS_EXTRUDE4_DEPTH)

    # Fillet6
    fillet6_edges = [part.edges().sort_by_distance(p)[0] for p in [
        (-3.125, 17.5, 13),
        (3.125, 17.5, 13),
        (3.125, 27.5, 13),
        (-3.125, 27.5, 13),
    ]]
    fillet(fillet6_edges, radius=FILLET6_R - 0.0001)  # a hair under: the kernel refuses the full size

    # Fillet7
    fillet7_edges = [part.edges().sort_by_distance(p)[0] for p in [
        (-4.5, 22.5, 3),
        (4.5, 22.5, 3),
    ]]
    fillet(fillet7_edges, radius=FILLET7_R)

    # Sketch7 → Boss-Extrude5 (add)
    with BuildSketch(Plane.ZY.offset(4.5).offset(BOSS_EXTRUDE5_START)):
        with BuildLine():
            ThreePointArc((9.75, 22.5), (8.669696007, 24.116789182), (6.762563133, 23.737436867))
            Line((6.762563133, 23.737436867), (9.237436867, 21.262563133))
            ThreePointArc((9.237436867, 21.262563133), (9.616789182, 21.830303993), (9.75, 22.5))
        make_face()
        with BuildLine():
            Line((9.237436867, 21.262563133), (6.762563133, 23.737436867))
            ThreePointArc((6.762563133, 23.737436867), (6.762563133, 21.262563133), (9.237436867, 21.262563133))
        make_face()
    extrude(amount=-BOSS_EXTRUDE5_DEPTH)

    # Sketch9 → Boss-Extrude6 (add)
    with BuildSketch(Plane(origin=(4.5, 0, 0), x_dir=(0, 0, -1), z_dir=(1, 0, 0)).offset(BOSS_EXTRUDE6_START)):
        with BuildLine():
            ThreePointArc((-8, 24.25), (-9.75, 22.5), (-8, 20.75))
            Line((-8, 20.75), (-8, 24.25))
        make_face()
        with BuildLine():
            Line((-8, 24.25), (-8, 20.75))
            ThreePointArc((-8, 20.75), (-6.762563133, 21.262563133), (-6.25, 22.5))
            ThreePointArc((-6.25, 22.5), (-6.762563133, 23.737436867), (-8, 24.25))
        make_face()
    extrude(amount=BOSS_EXTRUDE6_DEPTH)

    # Chamfer2
    chamfer2_edges = [part.edges().sort_by_distance(p)[0] for p in [
        (-9.5, 25, 3),
        (9.5, 25, 3),
    ]]
    chamfer2_side = [part.faces().sort_by_distance(p)[0] for p in [
        (0, -1.464120363, 3),
    ]]
    chamfer(chamfer2_edges, length=CHAMFER2_SIZE, length2=CHAMFER2_SIZE2, reference=chamfer2_side[0])

    # Boss-Extrude7: up to this plane
    boss_extrude7_end = Plane(origin=(-9.5, 27.5, 18), z_dir=(0.9805806756909196, 0, 0.19611613513818726))
    # Sketch10 → Boss-Extrude7 (add, up to the surface)
    with BuildSketch(Plane(origin=(5.673076923, 0, -1.134615385), x_dir=(0.1961161351381873, 0, 0.9805806756909196), z_dir=(-0.9805806756909196, 0, 0.1961161351381873)), mode=Mode.PRIVATE) as boss_extrude7_sk1:
        with Locations((18.013555446, 25)):
            Rectangle(SKETCH10_W, SKETCH10_H)
    boss_extrude7_tool1 = split(extrude(boss_extrude7_sk1.sketch, amount=BOSS_EXTRUDE7_REACH, dir=(-1, 0, 0), mode=Mode.PRIVATE), bisect_by=boss_extrude7_end, keep=Keep.BOTH, mode=Mode.PRIVATE)
    add(boss_extrude7_tool1.solids().sort_by_distance((9.205826, 25, 16.529129))[0])

    # Fillet8: read off the stored shape, not the designer's step
    # Fillet8 outline → Fillet8 (revolve, cut)
    with BuildSketch(Plane(origin=(0, 22.5, 8), x_dir=(0, 1, 0), z_dir=(0, 0, -1))):
        with BuildLine():
            ThreePointArc((1.75, 1), (1.603553391, 0.646446609), (1.25, 0.5))
            Line((1.25, 0.5), (1.75, 0.5))
            Line((1.75, 0.5), (1.75, 1))
        make_face()
        with BuildLine():
            Line((1.75, -0.5), (1.25, -0.5))
            ThreePointArc((1.25, -0.5), (1.603553391, -0.646446609), (1.75, -1))
            Line((1.75, -1), (1.75, -0.5))
        make_face()
    revolve(axis=Axis((0, 22.5, 8), (1, 0, 0)), mode=Mode.SUBTRACT)

    # Sketch15 → Boss-Extrude8 (add)
    with BuildSketch(Plane(origin=(0, 0, 0), x_dir=(-1, 0, 0), z_dir=(0, 0, -1))):
        Rectangle(SKETCH15_W, SKETCH15_H)
    extrude(amount=BOSS_EXTRUDE8_DEPTH)

    # Sketch16 → Cut-Extrude5 (cut)
    with BuildSketch(Plane.XY.offset(3)):
        Polygon((-17.5, 22.5), (-17.5, 17.5), (-5.5, 17.5), align=None)
        Polygon((17.5, 22.5), (5.5, 17.5), (17.5, 17.5), align=None)
        Polygon((-17.5, 17.5), (-17.5, -22.5), (-12.5, -22.5), (-9.5, -22.5), (9.5, -22.5), (12.5, -22.5), (17.5, -22.5), (17.5, 17.5), (5.5, 17.5), (1.75, 17.5), (-1.75, 17.5), (-5.5, 17.5), align=None)
    extrude(amount=-CUT_EXTRUDE5_DEPTH, mode=Mode.SUBTRACT)


with BuildPart() as cut_extrude5_piece_1:
    # of the separate pieces the step leaves, piece 1, a body of its own (cut_extrude5_pieces)
    add(part.part.solids().sort_by_distance((6.5, 27.5, 3))[0])



with BuildPart() as cut_extrude5_piece_2:
    # of the separate pieces the step leaves, piece 2, a body of its own (cut_extrude5_pieces)
    add(part.part.solids().sort_by_distance((17.5, -27.5, 3))[0])


with BuildPart() as cut_extrude5_piece_1_1:
    add(cut_extrude5_piece_1.part)

    add(cut_extrude5_piece_2.part)  # Loft3 merges Cut-Extrude5 piece 2
    # Sketch13 → Loft3 section 0
    with BuildSketch(Plane.XZ.offset(-22.5)):
        with BuildLine():
            Line((9.5, 18), (8.911651595, 15.058257973))
            Line((8.911651595, 15.058257973), (15.088348405, 15.058257973))
            Line((15.088348405, 15.058257973), (14.5, 18))
            Line((14.5, 18), (9.5, 18))
        make_face()
    # Sketch17 → Loft3 section 1
    with BuildSketch(Plane(origin=(0, -22.5, 0), x_dir=(1, 0, 0), z_dir=(0, 1, 0))):
        with BuildLine():
            Line((12.5, -3), (9.5, -3))
            Line((9.5, -3), (9.5, 7))
            Line((9.5, 7), (12.5, 7))
            Line((12.5, 7), (12.5, -3))
        make_face()
    loft()

    # Sketch12 → Loft4 section 0
    with BuildSketch(Plane.XZ.offset(-22.5)):
        with BuildLine():
            Line((-9.5, 18), (-8.911651595, 15.058257973))
            Line((-8.911651595, 15.058257973), (-15.088348405, 15.058257973))
            Line((-15.088348405, 15.058257973), (-14.5, 18))
            Line((-14.5, 18), (-9.5, 18))
        make_face()
    # Sketch18 → Loft4 section 1
    with BuildSketch(Plane(origin=(0, -22.5, 0), x_dir=(1, 0, 0), z_dir=(0, 1, 0))):
        with BuildLine():
            Line((-12.5, -3), (-9.5, -3))
            Line((-9.5, -3), (-9.5, 7))
            Line((-9.5, 7), (-12.5, 7))
            Line((-12.5, 7), (-12.5, -3))
        make_face()
    loft()

    # Sketch19 → Boss-Extrude9 (add)
    with BuildSketch(Plane(origin=(0, -22.5, 0), x_dir=(1, 0, 0), z_dir=(0, 1, 0)).offset(BOSS_EXTRUDE9_START)):
        with Locations((15, 2)):
            Rectangle(SKETCH19_W, SKETCH19_H)
        with Locations((-15, 2)):
            Rectangle(SKETCH19_W, SKETCH19_H)
    extrude(amount=BOSS_EXTRUDE9_DEPTH)


solid = cut_extrude5_piece_1_1.part
